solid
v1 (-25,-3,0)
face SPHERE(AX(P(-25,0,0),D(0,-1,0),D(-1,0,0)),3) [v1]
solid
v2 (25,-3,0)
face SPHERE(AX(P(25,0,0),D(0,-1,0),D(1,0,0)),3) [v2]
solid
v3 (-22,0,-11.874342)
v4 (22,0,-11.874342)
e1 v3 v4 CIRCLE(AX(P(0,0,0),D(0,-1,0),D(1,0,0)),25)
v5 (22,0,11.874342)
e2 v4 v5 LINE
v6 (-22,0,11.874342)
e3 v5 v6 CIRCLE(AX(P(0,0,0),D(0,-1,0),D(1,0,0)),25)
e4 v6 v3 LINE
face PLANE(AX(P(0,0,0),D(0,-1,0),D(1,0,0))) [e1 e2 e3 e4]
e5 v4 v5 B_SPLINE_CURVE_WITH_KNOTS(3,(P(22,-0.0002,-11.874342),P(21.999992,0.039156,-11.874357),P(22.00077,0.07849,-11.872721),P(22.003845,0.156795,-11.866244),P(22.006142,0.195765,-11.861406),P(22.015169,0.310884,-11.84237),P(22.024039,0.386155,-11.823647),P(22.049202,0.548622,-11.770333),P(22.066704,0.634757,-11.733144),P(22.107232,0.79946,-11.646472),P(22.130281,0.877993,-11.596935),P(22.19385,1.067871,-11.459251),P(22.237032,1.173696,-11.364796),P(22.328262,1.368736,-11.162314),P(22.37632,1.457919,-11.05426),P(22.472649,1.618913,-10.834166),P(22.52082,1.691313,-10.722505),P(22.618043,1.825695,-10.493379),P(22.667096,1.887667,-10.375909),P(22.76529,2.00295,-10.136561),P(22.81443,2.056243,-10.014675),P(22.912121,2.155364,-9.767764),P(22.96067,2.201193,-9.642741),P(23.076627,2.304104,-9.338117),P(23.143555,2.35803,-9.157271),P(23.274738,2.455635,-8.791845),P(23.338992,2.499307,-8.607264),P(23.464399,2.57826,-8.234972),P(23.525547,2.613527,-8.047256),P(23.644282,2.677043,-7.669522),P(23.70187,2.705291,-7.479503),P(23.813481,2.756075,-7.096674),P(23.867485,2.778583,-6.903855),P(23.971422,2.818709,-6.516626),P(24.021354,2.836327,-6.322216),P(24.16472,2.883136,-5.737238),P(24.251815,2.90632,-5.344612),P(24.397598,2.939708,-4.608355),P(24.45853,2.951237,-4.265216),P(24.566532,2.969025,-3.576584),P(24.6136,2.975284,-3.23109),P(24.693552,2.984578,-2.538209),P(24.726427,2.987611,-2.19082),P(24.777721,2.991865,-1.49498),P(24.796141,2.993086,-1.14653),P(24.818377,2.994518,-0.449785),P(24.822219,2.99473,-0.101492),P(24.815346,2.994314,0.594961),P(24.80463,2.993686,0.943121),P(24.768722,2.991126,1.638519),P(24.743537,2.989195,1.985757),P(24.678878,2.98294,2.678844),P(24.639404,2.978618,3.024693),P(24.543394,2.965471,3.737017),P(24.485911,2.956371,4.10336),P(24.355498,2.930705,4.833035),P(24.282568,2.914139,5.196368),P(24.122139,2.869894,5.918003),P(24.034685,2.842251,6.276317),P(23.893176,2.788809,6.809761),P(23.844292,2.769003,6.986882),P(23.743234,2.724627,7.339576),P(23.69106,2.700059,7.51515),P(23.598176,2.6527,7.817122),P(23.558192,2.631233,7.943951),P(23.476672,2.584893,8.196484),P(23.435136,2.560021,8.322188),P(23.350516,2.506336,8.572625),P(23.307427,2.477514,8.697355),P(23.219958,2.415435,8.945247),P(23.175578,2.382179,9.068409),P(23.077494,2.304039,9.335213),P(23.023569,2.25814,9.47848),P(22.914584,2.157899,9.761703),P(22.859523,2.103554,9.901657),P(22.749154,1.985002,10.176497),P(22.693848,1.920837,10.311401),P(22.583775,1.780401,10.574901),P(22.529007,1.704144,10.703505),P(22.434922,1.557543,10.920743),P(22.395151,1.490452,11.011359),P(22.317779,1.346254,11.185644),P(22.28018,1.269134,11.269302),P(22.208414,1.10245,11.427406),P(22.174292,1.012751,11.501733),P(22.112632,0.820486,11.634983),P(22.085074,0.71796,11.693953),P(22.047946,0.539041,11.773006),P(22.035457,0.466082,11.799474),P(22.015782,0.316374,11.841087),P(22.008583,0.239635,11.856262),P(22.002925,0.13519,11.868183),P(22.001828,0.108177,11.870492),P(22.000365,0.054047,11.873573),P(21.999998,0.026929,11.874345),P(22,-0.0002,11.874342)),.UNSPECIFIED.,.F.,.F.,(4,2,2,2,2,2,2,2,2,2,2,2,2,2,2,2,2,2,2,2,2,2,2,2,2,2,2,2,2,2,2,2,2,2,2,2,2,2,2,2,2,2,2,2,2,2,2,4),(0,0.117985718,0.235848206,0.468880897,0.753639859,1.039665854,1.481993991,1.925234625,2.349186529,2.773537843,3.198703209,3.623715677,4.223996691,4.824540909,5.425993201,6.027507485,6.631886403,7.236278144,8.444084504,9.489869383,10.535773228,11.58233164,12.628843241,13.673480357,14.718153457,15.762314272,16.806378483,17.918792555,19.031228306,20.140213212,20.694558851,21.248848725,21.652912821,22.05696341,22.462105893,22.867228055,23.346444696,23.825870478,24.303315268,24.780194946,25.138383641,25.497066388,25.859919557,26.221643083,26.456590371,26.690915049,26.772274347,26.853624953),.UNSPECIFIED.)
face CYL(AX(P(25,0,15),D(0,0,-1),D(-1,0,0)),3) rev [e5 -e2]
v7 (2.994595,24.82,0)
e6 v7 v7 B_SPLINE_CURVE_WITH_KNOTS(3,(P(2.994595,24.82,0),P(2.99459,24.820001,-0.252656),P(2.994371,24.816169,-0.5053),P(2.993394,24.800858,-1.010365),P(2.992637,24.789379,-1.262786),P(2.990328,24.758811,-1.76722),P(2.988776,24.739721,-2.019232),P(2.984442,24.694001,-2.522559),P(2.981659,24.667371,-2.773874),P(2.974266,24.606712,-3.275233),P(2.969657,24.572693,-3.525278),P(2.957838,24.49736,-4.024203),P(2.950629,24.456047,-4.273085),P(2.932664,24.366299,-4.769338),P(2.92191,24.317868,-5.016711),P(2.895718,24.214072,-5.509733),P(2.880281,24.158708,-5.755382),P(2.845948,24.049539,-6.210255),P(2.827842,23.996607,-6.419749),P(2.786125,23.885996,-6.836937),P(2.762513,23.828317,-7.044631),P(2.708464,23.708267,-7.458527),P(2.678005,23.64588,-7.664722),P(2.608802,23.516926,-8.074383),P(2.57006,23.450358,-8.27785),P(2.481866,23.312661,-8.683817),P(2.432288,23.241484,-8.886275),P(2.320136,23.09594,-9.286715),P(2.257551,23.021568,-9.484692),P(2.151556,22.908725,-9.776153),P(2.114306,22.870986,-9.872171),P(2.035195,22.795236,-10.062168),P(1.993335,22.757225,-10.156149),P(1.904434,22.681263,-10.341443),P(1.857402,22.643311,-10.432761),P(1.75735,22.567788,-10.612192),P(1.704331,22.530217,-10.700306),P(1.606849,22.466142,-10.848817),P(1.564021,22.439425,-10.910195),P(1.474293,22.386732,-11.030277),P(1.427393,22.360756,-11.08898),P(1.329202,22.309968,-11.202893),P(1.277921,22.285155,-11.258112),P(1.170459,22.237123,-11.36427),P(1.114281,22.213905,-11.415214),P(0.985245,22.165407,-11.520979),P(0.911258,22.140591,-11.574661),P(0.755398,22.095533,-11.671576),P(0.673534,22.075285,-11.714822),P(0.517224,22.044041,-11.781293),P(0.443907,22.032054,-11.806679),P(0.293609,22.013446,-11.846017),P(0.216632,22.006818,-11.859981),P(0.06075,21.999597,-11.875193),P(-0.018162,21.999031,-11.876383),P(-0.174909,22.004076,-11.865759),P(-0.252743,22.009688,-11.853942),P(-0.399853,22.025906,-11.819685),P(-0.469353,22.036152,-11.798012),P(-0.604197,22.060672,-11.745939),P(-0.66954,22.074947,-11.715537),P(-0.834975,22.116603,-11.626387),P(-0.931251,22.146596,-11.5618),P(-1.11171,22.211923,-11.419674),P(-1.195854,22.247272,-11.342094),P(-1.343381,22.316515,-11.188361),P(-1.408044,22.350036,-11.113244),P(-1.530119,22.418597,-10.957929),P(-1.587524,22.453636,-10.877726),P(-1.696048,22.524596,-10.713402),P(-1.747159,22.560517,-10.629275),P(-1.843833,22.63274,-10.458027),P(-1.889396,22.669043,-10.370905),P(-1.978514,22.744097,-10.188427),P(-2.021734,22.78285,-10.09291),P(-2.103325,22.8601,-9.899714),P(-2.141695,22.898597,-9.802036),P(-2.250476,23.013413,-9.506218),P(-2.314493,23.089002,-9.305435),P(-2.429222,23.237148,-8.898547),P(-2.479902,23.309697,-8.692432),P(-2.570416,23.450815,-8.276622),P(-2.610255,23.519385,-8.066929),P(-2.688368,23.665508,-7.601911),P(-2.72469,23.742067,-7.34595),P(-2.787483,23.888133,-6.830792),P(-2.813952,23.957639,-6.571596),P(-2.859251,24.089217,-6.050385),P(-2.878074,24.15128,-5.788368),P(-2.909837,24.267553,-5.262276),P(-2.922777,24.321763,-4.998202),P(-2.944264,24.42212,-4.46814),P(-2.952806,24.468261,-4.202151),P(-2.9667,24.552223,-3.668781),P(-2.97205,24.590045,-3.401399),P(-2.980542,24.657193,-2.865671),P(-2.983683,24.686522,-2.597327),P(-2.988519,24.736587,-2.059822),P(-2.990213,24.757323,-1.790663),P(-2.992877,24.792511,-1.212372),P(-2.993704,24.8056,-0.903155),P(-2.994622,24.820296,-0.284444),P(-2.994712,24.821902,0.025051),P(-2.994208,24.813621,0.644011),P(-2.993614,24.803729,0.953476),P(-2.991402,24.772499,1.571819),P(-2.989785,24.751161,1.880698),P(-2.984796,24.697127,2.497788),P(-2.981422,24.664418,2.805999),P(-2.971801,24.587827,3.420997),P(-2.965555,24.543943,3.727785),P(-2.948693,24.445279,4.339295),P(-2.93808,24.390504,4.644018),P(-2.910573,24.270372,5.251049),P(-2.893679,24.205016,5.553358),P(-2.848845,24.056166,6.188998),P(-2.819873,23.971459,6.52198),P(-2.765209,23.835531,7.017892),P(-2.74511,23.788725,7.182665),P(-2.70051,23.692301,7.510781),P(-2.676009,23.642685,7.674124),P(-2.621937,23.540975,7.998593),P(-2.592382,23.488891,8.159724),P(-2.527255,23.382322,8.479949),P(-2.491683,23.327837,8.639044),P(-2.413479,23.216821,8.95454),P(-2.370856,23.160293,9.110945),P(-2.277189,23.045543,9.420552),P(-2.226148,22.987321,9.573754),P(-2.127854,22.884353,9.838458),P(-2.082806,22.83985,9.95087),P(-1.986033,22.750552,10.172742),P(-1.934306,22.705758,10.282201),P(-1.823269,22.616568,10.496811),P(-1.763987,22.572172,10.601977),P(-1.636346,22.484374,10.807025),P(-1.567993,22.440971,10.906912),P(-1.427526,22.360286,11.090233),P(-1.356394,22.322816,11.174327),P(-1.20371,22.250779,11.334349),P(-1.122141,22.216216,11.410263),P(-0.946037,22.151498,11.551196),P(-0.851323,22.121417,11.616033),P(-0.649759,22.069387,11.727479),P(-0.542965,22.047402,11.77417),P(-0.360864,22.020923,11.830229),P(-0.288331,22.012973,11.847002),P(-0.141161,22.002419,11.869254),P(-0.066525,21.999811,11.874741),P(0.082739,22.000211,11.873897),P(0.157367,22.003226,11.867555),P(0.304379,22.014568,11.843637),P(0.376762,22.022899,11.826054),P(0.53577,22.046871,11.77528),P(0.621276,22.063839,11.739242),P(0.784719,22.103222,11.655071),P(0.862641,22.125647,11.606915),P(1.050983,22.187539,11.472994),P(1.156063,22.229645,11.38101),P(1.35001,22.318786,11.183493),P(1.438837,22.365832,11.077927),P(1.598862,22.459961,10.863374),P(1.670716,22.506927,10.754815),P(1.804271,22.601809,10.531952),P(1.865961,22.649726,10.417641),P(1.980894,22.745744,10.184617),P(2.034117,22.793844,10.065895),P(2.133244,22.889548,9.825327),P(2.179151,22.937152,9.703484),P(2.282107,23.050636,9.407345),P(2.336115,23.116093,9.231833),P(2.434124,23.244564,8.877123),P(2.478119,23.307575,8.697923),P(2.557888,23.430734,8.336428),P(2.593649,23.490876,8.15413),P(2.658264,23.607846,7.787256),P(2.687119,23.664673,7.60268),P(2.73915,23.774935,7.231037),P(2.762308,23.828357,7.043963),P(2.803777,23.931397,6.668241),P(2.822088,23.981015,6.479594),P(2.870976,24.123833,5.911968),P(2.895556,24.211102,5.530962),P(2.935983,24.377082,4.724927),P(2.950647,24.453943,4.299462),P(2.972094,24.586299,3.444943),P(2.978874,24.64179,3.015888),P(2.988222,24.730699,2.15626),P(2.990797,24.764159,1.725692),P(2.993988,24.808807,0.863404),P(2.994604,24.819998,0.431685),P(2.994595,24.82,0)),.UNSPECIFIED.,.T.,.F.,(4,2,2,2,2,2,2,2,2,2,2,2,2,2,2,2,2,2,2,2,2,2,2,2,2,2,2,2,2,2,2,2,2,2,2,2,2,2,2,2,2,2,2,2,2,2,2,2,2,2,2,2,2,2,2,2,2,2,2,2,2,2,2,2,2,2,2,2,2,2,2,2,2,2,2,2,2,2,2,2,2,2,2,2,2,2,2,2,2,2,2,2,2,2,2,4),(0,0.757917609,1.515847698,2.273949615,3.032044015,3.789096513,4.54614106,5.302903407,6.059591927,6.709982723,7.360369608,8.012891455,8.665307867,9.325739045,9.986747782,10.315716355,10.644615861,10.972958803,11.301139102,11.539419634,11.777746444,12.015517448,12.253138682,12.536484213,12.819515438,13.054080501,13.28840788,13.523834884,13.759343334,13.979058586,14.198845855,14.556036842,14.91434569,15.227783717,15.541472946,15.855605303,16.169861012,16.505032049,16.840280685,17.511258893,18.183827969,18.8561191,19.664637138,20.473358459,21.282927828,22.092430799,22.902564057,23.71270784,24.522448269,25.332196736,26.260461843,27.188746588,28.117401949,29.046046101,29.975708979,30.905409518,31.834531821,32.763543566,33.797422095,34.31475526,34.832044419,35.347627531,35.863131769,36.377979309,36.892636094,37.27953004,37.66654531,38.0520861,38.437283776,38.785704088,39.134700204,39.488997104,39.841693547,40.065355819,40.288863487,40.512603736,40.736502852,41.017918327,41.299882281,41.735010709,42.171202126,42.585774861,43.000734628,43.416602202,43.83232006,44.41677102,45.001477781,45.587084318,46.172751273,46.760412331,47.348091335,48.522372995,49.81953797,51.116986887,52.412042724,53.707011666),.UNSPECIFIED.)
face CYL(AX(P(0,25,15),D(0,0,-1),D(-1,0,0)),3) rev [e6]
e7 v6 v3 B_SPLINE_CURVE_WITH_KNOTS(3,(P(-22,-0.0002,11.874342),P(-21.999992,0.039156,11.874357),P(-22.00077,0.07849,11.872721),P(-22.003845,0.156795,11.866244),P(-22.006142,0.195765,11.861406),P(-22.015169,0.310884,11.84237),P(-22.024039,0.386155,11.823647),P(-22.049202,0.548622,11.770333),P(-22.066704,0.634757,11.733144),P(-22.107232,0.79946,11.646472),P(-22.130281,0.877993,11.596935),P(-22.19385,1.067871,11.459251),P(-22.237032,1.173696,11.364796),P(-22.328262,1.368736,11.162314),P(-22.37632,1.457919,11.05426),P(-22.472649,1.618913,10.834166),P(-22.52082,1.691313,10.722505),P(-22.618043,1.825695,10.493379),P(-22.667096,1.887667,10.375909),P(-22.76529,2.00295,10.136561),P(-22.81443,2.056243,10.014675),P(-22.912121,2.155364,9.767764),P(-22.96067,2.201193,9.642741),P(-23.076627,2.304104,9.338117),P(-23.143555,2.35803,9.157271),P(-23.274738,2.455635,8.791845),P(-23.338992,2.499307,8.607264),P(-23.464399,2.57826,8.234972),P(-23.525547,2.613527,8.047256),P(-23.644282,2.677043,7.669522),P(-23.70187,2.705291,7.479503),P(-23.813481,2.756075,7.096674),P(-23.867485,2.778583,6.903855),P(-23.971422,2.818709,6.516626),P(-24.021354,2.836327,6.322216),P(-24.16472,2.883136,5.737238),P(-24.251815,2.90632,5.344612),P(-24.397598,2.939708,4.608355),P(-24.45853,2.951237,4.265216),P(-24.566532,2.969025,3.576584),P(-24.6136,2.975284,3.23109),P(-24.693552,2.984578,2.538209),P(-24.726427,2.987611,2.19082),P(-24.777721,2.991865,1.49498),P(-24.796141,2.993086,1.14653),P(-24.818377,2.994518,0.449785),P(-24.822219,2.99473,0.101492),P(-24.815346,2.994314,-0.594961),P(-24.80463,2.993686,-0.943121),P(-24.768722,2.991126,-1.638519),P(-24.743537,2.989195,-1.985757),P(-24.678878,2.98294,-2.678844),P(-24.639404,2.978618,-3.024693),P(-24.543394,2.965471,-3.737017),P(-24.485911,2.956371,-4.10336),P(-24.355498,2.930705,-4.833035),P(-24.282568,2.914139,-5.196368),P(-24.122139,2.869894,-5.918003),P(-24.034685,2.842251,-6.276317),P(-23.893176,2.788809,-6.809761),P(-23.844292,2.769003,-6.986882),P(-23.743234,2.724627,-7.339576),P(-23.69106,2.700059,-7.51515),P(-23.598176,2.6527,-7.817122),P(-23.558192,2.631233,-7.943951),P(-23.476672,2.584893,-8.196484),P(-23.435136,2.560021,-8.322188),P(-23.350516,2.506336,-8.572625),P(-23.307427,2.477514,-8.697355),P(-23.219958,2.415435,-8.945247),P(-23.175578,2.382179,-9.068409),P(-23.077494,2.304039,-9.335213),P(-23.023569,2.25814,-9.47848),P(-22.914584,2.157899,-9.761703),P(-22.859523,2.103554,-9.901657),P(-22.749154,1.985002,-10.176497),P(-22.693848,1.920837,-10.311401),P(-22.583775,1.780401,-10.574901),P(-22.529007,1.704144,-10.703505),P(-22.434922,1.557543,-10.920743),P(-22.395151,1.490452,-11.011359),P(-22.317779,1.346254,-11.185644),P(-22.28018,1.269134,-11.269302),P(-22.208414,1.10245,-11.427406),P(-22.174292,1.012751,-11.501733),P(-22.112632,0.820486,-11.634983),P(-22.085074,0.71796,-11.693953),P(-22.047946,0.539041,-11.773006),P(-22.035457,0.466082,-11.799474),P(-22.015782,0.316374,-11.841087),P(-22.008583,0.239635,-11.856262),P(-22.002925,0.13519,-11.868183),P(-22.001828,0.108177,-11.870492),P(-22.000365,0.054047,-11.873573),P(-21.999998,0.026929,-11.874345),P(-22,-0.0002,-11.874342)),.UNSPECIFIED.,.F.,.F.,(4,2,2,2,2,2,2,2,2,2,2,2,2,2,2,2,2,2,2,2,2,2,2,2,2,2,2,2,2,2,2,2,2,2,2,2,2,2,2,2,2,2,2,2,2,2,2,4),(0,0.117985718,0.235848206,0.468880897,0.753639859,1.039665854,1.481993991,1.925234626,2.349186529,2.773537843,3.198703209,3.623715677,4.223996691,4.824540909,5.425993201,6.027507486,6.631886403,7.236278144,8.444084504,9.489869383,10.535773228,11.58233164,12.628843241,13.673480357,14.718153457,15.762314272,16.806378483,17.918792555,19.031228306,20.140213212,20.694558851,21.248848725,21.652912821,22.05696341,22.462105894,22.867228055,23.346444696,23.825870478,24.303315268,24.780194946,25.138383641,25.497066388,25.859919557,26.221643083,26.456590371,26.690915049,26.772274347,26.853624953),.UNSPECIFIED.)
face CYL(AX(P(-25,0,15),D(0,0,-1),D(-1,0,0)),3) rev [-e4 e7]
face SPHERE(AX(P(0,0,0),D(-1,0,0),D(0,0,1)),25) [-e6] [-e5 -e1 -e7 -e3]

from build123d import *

# Parameters (mm, degrees)
CORTAR_EXTRUIR1_DEPTH      = 15
CORTAR_EXTRUIR1_DEPTH_BACK = 15
CROQUIS4_R                 = 3


# Read off the part's stored shape, not the designer's step: Revolución2
with BuildPart() as part:
    # Revolución2 outline → Revolución2 (revolve)
    with BuildSketch(Plane.XY):
        with BuildLine():
            Line((0, 0), (25, -2.5e-08))
            ThreePointArc((25, -2.5e-08), (17.677669539, 17.677669521), (0, 25))
            Line((0, 25), (0, 0))
        make_face()
    revolve(axis=Axis((0, 0, 0), (0, 1, 0)))

    # Croquis4 → Cortar-Extruir1 (cut, two sides: drawn at the far end of the back side and taken through both)
    with BuildSketch(Plane.XY.offset(-CORTAR_EXTRUIR1_DEPTH_BACK)):
        with Locations((0, 25)):
            Circle(CROQUIS4_R)
        with Locations((25, 0)):
            Circle(CROQUIS4_R)
        with Locations((-25, 0)):
            Circle(CROQUIS4_R)
    extrude(amount=CORTAR_EXTRUIR1_DEPTH + CORTAR_EXTRUIR1_DEPTH_BACK, mode=Mode.SUBTRACT)


with BuildPart() as body_2:
    # Croquis10 → Revolución4 (revolve)
    with BuildSketch(Plane.XY):
        with BuildLine():
            Line((25, -3), (25, 3))
            ThreePointArc((25, 3), (28, 0), (25, -3))
        make_face()
    revolve(axis=Axis((25, -3, 0), (0, 1, 0)))


with BuildPart() as body_3:
    # Croquis11 → Revolución5 (revolve)
    with BuildSketch(Plane.XY):
        with BuildLine():
            Line((-25, -3), (-25, 3))
            ThreePointArc((-25, 3), (-28, 0), (-25, -3))
        make_face()
    revolve(axis=Axis((-25, -3, 0), (0, 1, 0)))


solid = Compound([part.part, body_2.part, body_3.part])
